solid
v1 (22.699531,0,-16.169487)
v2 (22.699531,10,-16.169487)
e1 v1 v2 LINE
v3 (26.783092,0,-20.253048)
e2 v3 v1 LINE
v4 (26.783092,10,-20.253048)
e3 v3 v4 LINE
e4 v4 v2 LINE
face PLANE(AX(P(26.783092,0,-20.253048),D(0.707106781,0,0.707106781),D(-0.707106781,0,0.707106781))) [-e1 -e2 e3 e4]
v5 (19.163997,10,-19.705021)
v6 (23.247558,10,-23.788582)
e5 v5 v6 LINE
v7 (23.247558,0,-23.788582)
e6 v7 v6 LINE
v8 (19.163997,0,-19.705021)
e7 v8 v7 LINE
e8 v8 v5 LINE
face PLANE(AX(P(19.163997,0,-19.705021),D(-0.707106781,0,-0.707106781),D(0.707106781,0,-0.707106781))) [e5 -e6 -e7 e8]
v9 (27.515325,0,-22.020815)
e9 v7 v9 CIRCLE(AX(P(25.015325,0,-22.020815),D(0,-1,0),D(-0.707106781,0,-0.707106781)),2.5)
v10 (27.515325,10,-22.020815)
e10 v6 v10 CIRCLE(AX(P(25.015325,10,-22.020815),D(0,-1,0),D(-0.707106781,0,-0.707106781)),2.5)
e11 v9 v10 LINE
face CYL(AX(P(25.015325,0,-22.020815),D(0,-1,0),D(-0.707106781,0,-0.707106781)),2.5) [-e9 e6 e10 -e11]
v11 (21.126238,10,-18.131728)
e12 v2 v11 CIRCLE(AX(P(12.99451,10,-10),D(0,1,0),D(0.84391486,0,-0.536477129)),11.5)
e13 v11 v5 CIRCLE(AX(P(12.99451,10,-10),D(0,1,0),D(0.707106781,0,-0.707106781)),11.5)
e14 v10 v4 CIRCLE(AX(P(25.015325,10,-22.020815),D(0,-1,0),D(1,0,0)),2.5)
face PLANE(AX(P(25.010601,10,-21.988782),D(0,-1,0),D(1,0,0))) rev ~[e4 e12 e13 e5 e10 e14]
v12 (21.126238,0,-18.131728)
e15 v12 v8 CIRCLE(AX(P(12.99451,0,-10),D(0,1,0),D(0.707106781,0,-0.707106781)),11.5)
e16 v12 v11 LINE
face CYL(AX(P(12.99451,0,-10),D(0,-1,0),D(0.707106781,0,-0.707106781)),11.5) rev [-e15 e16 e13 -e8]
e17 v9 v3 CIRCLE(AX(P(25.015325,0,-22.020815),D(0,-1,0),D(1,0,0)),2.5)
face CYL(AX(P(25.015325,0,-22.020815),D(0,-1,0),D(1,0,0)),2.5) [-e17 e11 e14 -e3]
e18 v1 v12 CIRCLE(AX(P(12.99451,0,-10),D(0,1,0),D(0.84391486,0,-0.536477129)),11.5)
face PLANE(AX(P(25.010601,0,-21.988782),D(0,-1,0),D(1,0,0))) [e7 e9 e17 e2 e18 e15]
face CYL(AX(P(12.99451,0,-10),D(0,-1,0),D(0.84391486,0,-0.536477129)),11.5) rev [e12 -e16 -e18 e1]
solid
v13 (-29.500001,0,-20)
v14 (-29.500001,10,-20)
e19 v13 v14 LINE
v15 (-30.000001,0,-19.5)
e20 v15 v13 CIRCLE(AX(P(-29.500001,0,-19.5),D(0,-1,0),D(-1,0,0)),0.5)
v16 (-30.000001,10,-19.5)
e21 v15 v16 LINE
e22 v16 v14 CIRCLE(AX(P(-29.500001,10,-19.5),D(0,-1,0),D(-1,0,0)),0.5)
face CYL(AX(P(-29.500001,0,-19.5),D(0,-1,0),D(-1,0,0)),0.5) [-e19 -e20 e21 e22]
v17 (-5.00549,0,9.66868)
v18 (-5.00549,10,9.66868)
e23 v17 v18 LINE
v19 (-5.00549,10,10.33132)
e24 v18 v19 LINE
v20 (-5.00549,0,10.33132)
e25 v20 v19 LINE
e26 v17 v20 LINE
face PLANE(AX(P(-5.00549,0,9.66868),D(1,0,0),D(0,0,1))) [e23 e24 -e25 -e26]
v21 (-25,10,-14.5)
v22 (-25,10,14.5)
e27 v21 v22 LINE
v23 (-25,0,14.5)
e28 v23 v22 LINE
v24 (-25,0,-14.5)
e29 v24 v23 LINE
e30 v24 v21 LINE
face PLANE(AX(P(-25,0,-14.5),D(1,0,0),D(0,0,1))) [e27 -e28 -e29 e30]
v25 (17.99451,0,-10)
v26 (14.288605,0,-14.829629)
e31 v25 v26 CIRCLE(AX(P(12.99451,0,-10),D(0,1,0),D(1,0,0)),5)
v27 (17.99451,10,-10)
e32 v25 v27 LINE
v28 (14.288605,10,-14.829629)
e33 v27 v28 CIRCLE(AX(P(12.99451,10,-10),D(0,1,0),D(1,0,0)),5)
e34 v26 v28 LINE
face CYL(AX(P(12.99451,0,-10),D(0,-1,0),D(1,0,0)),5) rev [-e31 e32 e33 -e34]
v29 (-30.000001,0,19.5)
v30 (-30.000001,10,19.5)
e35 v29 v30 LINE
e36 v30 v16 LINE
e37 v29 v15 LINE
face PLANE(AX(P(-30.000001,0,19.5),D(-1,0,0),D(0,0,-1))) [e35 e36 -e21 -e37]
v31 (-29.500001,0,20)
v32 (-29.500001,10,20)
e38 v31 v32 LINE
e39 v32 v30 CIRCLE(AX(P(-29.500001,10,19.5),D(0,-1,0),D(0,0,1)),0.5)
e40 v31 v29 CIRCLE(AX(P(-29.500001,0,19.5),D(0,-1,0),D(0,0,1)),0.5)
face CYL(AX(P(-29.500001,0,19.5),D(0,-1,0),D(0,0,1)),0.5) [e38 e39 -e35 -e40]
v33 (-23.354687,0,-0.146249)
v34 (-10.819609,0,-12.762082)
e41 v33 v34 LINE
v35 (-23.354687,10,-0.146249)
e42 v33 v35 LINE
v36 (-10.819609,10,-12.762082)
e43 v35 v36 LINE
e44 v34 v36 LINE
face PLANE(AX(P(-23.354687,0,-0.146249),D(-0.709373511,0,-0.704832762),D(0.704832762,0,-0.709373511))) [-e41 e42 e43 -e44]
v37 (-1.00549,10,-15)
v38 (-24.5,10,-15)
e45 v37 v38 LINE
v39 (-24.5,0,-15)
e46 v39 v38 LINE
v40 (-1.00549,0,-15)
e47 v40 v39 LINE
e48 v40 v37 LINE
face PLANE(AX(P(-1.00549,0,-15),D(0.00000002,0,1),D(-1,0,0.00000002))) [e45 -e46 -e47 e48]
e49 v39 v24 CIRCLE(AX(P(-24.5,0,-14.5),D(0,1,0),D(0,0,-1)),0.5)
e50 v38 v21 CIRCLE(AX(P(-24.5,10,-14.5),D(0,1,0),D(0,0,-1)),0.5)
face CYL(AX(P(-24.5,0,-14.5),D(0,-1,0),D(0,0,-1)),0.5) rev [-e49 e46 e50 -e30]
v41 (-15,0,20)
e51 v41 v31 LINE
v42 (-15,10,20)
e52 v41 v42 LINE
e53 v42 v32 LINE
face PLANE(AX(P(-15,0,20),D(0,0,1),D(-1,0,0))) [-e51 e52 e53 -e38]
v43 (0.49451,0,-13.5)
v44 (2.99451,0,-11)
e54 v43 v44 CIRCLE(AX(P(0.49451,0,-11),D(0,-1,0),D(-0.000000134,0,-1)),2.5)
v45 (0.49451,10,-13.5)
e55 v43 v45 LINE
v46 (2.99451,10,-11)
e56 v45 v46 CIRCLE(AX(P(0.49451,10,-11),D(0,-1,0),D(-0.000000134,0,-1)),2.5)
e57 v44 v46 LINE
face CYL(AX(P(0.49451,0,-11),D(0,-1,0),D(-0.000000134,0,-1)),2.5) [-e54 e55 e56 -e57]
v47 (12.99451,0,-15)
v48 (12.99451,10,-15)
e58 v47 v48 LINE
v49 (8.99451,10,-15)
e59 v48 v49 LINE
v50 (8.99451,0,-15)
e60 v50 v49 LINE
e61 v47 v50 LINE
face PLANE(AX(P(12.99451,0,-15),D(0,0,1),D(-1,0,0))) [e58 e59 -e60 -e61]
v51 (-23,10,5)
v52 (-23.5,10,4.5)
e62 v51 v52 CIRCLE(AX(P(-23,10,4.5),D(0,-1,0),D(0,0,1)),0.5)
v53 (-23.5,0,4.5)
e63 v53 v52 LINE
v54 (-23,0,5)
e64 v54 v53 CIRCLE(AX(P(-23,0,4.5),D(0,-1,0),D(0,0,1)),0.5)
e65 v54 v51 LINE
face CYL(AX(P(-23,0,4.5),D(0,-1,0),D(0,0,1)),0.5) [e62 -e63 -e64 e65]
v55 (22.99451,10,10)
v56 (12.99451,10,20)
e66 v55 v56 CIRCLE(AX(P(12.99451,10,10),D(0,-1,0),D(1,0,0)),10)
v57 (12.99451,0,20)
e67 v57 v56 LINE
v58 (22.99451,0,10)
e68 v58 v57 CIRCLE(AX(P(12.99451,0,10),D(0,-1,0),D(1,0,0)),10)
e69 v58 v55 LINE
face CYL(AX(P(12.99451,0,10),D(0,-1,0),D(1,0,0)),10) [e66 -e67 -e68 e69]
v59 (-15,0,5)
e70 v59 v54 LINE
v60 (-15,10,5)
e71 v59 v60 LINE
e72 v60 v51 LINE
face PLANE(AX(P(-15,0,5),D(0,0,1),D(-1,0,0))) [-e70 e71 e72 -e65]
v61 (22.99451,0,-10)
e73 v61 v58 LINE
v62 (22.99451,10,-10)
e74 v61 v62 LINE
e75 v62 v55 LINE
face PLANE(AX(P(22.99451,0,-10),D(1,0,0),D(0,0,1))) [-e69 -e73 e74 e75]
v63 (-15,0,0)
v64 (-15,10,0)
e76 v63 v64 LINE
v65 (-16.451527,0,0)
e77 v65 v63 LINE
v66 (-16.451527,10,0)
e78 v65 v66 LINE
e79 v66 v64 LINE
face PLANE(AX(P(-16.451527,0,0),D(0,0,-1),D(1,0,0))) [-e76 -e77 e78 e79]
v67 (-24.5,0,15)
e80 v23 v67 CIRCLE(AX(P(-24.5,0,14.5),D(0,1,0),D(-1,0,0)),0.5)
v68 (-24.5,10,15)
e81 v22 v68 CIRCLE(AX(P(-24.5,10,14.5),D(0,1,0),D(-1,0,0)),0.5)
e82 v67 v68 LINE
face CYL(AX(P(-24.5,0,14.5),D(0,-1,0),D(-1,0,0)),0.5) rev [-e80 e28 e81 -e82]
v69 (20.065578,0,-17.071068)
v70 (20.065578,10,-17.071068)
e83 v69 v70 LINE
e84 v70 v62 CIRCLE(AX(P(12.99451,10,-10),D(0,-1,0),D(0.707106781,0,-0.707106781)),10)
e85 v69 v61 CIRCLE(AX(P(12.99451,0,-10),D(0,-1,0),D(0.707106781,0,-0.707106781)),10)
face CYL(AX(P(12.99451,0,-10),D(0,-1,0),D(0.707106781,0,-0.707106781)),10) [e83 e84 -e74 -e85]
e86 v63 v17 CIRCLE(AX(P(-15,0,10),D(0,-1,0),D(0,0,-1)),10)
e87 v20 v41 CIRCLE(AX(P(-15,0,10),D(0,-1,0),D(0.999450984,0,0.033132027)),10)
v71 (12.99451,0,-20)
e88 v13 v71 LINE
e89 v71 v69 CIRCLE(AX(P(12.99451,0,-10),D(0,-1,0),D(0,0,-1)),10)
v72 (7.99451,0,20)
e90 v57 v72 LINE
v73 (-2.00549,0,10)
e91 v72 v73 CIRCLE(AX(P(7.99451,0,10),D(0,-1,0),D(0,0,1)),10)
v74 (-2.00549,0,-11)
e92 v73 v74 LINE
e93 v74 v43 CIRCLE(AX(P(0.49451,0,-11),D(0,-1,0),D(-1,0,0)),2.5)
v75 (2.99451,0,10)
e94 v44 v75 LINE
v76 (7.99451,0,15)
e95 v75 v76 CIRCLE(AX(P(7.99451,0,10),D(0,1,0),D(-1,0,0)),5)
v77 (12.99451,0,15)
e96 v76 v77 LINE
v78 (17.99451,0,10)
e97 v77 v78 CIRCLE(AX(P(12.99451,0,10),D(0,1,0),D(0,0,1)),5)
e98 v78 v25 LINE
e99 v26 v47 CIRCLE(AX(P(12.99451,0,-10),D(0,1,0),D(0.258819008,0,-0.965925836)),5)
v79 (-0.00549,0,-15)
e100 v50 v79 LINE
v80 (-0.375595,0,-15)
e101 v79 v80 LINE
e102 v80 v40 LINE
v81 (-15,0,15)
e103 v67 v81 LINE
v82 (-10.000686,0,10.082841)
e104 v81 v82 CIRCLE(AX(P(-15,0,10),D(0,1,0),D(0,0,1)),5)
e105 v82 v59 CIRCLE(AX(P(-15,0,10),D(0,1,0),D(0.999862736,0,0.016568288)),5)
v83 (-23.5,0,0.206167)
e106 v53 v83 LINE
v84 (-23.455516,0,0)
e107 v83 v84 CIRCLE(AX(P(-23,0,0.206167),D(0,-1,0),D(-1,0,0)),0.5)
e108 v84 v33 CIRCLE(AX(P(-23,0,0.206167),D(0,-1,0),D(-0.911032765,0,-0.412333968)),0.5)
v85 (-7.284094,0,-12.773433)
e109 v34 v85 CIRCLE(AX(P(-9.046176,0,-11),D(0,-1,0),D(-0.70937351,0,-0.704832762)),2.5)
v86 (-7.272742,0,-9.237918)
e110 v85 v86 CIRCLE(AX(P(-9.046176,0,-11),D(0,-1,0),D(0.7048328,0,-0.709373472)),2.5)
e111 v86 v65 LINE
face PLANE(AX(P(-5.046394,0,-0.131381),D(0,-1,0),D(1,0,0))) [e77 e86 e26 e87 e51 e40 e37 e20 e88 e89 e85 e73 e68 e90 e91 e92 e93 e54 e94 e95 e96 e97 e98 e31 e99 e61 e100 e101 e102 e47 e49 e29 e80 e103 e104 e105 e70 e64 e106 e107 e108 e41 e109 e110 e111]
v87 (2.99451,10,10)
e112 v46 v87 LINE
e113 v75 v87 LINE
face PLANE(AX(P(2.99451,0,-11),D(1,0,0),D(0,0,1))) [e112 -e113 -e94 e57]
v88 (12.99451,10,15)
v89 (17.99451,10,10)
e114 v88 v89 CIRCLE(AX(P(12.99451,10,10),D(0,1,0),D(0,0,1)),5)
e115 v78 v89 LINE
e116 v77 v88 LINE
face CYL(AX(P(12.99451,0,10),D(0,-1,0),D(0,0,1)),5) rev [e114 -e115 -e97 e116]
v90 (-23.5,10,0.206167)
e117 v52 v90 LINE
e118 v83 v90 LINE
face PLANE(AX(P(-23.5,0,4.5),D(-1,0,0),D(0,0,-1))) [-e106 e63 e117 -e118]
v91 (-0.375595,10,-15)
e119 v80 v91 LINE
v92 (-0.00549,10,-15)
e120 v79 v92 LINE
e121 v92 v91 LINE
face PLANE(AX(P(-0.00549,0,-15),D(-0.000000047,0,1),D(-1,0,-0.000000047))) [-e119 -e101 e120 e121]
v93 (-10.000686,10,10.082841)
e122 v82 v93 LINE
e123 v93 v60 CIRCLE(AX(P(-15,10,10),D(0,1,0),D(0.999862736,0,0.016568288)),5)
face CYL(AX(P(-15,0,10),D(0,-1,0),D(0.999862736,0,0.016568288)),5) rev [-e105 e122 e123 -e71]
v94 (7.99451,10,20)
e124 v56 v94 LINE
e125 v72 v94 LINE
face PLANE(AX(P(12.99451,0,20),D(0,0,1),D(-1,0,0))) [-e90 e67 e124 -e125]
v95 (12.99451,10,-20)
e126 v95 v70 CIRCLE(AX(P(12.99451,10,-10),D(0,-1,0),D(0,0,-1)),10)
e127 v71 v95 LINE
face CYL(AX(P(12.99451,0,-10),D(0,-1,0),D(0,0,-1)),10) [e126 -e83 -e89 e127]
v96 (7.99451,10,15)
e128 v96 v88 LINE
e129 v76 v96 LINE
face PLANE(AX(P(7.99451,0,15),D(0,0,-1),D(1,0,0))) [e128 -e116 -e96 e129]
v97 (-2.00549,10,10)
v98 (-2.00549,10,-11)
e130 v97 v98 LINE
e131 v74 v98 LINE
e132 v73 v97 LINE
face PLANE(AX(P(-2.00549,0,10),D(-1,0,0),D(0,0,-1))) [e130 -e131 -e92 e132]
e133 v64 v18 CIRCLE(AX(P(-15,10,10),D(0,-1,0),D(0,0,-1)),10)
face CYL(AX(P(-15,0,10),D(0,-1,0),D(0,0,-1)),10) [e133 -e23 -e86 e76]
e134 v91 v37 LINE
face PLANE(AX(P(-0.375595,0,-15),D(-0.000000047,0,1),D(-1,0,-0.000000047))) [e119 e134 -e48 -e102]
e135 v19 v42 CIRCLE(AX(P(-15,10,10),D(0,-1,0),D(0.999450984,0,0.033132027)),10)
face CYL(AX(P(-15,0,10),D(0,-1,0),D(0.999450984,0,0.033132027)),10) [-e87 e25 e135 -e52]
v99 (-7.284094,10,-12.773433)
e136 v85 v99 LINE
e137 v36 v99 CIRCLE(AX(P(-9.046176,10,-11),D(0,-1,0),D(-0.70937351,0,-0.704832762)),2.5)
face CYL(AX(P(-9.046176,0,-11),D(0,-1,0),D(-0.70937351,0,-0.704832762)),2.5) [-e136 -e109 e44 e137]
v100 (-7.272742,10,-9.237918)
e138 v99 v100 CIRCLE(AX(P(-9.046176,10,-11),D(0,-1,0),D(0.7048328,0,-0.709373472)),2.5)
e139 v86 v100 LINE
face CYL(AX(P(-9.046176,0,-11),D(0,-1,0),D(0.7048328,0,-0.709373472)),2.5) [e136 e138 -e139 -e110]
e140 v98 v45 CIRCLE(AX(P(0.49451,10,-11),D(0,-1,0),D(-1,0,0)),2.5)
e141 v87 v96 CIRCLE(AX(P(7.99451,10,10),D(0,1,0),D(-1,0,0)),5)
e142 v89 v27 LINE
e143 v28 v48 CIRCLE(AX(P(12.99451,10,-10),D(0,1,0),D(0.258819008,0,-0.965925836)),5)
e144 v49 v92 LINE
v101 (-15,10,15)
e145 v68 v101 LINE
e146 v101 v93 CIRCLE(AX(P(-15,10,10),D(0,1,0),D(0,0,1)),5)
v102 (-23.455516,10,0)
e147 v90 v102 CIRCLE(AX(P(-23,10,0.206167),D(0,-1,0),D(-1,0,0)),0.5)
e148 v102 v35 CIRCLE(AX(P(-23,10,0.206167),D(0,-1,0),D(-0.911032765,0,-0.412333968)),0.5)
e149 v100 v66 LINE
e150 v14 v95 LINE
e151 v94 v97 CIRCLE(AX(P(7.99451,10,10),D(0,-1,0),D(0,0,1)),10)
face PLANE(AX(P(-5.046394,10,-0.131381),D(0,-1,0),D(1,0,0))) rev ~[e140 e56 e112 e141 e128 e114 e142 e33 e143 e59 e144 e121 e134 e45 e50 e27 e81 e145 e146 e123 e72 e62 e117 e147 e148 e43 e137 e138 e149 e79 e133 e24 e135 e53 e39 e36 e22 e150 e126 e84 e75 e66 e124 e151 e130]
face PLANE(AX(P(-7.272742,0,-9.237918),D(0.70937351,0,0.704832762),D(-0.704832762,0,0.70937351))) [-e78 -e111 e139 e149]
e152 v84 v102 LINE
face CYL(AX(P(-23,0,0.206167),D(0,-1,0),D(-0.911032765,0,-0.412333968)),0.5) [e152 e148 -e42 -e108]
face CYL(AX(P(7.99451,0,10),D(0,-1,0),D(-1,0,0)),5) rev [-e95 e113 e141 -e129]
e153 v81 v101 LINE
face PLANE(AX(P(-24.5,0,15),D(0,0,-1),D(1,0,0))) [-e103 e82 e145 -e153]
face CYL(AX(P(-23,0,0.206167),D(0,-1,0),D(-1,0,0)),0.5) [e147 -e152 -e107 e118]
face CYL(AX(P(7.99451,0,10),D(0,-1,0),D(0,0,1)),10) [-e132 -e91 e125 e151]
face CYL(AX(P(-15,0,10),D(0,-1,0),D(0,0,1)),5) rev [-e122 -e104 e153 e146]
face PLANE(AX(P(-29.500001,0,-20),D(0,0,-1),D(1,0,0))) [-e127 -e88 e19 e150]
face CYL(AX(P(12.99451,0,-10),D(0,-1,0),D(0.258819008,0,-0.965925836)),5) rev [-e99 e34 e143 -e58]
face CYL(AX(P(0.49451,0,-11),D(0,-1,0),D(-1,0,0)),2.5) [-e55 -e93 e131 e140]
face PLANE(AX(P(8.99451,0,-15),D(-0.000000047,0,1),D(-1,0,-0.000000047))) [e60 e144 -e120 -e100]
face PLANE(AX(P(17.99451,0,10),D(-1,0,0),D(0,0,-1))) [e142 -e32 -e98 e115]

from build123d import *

# Parameters (mm, degrees)
F1_DEPTH = 10


# Not quite as in the source:
# - ends of sketch curves that miss each other by under 0.0002 mm in the source are joined


with BuildPart() as f1:
    # F0 (on Front) → F1 (new body)
    with BuildSketch(Plane.XZ):
        with BuildLine():
            Line((-25, -14.4999996647), (-25, 14.5))
            ThreePointArc((-25, 14.5), (-24.8535533906, 14.8535533906), (-24.5, 15))
            Line((-24.5, 15), (-15, 15))
            ThreePointArc((-15, 15), (-11.493877298, 13.5647024558), (-10.0006863175, 10.0828414395))
            ThreePointArc((-10.0006863175, 10.0828414395), (-11.4352975442, 6.493877298), (-15, 5))
            Line((-15, 5), (-23, 5))
            ThreePointArc((-23, 5), (-23.3535533906, 4.8535533906), (-23.5, 4.5))
            Line((-23.5, 4.5), (-23.5, 0.2061669839))
            ThreePointArc((-23.5, 0.2061669839), (-23.4887525914, 0.1007112853), (-23.4555163825, 0))
            Line((-23.4555163825, 0), (-16.4515272404, 0))
            Line((-16.4515272404, 0), (-15, 0))
            ThreePointArc((-15, 0), (-8.0470582749, 2.8127473004), (-5.0054901633, 9.6686797265))
            Line((-5.0054901633, 9.6686797265), (-5.0054901633, 10.3313202735))
            ThreePointArc((-5.0054901633, 10.3313202735), (-8.0470582749, 17.1872526996), (-15, 20))
            Line((-15, 20), (-25, 20))
            Line((-25, 20), (-29.5000011921, 20))
            ThreePointArc((-29.5000011921, 20), (-29.8535545827, 19.8535533906), (-30.0000011921, 19.5))
            Line((-30.0000011921, 19.5), (-30.0000011921, 17.5))
            Line((-30.0000011921, 17.5), (-30.0000011921, -19.5))
            ThreePointArc((-30.0000011921, -19.5), (-29.8535545827, -19.8535533906), (-29.5000011921, -20))
            Line((-29.5000011921, -20), (-25, -20))
            Line((-25, -20), (-2.0054901633, -20))
            Line((-2.0054901633, -20), (-0.3755952516, -20))
            Line((-0.3755952516, -20), (8.9945098367, -20))
            Line((8.9945098367, -20), (12.9945098367, -20))
            ThreePointArc((12.9945098367, -20), (16.8213441604, -19.2387953251), (20.0655776486, -17.0710678119))
            ThreePointArc((20.0655776486, -17.0710678119), (22.2333051618, -13.8268343237), (22.9945098367, -10))
            Line((22.9945098367, -10), (22.9945098367, 10))
            ThreePointArc((22.9945098367, 10), (20.0655776486, 17.0710678119), (12.9945098367, 20))
            Line((12.9945098367, 20), (7.9945098367, 20))
            ThreePointArc((7.9945098367, 20), (0.9234420249, 17.0710678119), (-2.0054901633, 10))
            Line((-2.0054901633, 10), (-2.0054901633, -11.0000000643))
            ThreePointArc((-2.0054901633, -11.0000000643), (-1.2732571162, -12.7677670173), (0.4945098367, -13.5000000643))
            ThreePointArc((0.4945098367, -13.5000000643), (2.262277125, -12.7677670173), (2.994510172, -11.0000000643))
            Line((2.994510172, -11.0000000643), (2.994510172, 10))
            ThreePointArc((2.994510172, 10), (4.4589761679, 13.5355336689), (7.9945098367, 14.9999996647))
            Line((7.9945098367, 14.9999996647), (12.9945098367, 14.9999996647))
            ThreePointArc((12.9945098367, 14.9999996647), (16.5300435056, 13.5355336689), (17.9945095014, 10))
            Line((17.9945095014, 10), (17.9945095014, -10))
            ThreePointArc((17.9945095014, -10), (16.9612762133, -13.0438070177), (14.2886047885, -14.8296288577))
            ThreePointArc((14.2886047885, -14.8296288577), (13.6471406581, -14.9572239871), (12.9945098367, -14.9999996647))
            Line((12.9945098367, -14.9999996647), (8.9945098367, -14.9999996647))
            Line((8.9945098367, -14.9999996647), (-0.0054901633, -15.0000000878))
            Line((-0.0054901633, -15.0000000878), (-0.3755952516, -15.0000001052))
            Line((-0.3755952516, -15.0000001052), (-1.0054901633, -15.0000001348))
            Line((-1.0054901633, -15.0000001348), (-24.5, -14.9999996647))
            ThreePointArc((-24.5, -14.9999996647), (-24.8535533906, -14.8535530553), (-25, -14.4999996647))
        make_face()
        with BuildLine():
            Line((-16.4515272404, 0), (-23.4555163825, 0))
            ThreePointArc((-23.4555163825, 0), (-23.4116485183, -0.0776384025), (-23.3546867552, -0.1462493971))
            Line((-23.3546867552, -0.1462493971), (-10.8196093867, -12.7620815701))
            ThreePointArc((-10.8196093867, -12.7620815701), (-9.0542025953, -13.4999867782), (-7.284093705, -12.773433441))
            ThreePointArc((-7.284093705, -12.773433441), (-6.5461885926, -11.0080267446), (-7.2727419298, -9.2379178544))
            Line((-7.2727419298, -9.2379178544), (-16.4515272404, 0))
        make_face()
    extrude(amount=-F1_DEPTH)


with BuildPart() as f1b:
    # F0 (on Front) → F1, piece 2 (new body)
    with BuildSketch(Plane.XZ):
        with BuildLine():
            ThreePointArc((26.7830920699, -20.2530483272), (25.0153251169, -19.5208152802), (23.2475581639, -20.2530483272))
            ThreePointArc((23.2475581639, -20.2530483272), (22.5153251169, -22.0208152802), (23.2475581639, -23.7885822331))
            ThreePointArc((23.2475581639, -23.7885822331), (25.9720336978, -24.3305141114), (27.5153251169, -22.0208152802))
            ThreePointArc((27.5153251169, -22.0208152802), (27.3250239482, -21.0641066993), (26.7830920699, -20.2530483272))
        make_face()
        with BuildLine():
            Line((21.1262378204, -18.1317279836), (22.9945098367, -20))
            Line((22.9945098367, -20), (23.2475581639, -20.2530483272))
            ThreePointArc((23.2475581639, -20.2530483272), (25.0153251169, -19.5208152802), (26.7830920699, -20.2530483272))
            Line((26.7830920699, -20.2530483272), (22.6995307229, -16.1694869802))
            ThreePointArc((22.6995307229, -16.1694869802), (21.9666890592, -17.193747285), (21.1262378204, -18.1317279836))
        make_face()
        with BuildLine():
            Line((19.4589759308, -20), (22.9945098367, -20))
            Line((22.9945098367, -20), (21.1262378204, -18.1317279836))
            ThreePointArc((21.1262378204, -18.1317279836), (20.1882571217, -18.9721792225), (19.163996817, -19.7050208862))
            Line((19.163996817, -19.7050208862), (19.4589759308, -20))
        make_face()
        with BuildLine():
            Line((23.2475581639, -20.2530483272), (22.9945098367, -20))
            Line((22.9945098367, -20), (19.4589759308, -20))
            Line((19.4589759308, -20), (23.2475581639, -23.7885822331))
            ThreePointArc((23.2475581639, -23.7885822331), (22.5153251169, -22.0208152802), (23.2475581639, -20.2530483272))
        make_face()
    extrude(amount=-F1_DEPTH)


solid = Compound([f1.part, f1b.part])
